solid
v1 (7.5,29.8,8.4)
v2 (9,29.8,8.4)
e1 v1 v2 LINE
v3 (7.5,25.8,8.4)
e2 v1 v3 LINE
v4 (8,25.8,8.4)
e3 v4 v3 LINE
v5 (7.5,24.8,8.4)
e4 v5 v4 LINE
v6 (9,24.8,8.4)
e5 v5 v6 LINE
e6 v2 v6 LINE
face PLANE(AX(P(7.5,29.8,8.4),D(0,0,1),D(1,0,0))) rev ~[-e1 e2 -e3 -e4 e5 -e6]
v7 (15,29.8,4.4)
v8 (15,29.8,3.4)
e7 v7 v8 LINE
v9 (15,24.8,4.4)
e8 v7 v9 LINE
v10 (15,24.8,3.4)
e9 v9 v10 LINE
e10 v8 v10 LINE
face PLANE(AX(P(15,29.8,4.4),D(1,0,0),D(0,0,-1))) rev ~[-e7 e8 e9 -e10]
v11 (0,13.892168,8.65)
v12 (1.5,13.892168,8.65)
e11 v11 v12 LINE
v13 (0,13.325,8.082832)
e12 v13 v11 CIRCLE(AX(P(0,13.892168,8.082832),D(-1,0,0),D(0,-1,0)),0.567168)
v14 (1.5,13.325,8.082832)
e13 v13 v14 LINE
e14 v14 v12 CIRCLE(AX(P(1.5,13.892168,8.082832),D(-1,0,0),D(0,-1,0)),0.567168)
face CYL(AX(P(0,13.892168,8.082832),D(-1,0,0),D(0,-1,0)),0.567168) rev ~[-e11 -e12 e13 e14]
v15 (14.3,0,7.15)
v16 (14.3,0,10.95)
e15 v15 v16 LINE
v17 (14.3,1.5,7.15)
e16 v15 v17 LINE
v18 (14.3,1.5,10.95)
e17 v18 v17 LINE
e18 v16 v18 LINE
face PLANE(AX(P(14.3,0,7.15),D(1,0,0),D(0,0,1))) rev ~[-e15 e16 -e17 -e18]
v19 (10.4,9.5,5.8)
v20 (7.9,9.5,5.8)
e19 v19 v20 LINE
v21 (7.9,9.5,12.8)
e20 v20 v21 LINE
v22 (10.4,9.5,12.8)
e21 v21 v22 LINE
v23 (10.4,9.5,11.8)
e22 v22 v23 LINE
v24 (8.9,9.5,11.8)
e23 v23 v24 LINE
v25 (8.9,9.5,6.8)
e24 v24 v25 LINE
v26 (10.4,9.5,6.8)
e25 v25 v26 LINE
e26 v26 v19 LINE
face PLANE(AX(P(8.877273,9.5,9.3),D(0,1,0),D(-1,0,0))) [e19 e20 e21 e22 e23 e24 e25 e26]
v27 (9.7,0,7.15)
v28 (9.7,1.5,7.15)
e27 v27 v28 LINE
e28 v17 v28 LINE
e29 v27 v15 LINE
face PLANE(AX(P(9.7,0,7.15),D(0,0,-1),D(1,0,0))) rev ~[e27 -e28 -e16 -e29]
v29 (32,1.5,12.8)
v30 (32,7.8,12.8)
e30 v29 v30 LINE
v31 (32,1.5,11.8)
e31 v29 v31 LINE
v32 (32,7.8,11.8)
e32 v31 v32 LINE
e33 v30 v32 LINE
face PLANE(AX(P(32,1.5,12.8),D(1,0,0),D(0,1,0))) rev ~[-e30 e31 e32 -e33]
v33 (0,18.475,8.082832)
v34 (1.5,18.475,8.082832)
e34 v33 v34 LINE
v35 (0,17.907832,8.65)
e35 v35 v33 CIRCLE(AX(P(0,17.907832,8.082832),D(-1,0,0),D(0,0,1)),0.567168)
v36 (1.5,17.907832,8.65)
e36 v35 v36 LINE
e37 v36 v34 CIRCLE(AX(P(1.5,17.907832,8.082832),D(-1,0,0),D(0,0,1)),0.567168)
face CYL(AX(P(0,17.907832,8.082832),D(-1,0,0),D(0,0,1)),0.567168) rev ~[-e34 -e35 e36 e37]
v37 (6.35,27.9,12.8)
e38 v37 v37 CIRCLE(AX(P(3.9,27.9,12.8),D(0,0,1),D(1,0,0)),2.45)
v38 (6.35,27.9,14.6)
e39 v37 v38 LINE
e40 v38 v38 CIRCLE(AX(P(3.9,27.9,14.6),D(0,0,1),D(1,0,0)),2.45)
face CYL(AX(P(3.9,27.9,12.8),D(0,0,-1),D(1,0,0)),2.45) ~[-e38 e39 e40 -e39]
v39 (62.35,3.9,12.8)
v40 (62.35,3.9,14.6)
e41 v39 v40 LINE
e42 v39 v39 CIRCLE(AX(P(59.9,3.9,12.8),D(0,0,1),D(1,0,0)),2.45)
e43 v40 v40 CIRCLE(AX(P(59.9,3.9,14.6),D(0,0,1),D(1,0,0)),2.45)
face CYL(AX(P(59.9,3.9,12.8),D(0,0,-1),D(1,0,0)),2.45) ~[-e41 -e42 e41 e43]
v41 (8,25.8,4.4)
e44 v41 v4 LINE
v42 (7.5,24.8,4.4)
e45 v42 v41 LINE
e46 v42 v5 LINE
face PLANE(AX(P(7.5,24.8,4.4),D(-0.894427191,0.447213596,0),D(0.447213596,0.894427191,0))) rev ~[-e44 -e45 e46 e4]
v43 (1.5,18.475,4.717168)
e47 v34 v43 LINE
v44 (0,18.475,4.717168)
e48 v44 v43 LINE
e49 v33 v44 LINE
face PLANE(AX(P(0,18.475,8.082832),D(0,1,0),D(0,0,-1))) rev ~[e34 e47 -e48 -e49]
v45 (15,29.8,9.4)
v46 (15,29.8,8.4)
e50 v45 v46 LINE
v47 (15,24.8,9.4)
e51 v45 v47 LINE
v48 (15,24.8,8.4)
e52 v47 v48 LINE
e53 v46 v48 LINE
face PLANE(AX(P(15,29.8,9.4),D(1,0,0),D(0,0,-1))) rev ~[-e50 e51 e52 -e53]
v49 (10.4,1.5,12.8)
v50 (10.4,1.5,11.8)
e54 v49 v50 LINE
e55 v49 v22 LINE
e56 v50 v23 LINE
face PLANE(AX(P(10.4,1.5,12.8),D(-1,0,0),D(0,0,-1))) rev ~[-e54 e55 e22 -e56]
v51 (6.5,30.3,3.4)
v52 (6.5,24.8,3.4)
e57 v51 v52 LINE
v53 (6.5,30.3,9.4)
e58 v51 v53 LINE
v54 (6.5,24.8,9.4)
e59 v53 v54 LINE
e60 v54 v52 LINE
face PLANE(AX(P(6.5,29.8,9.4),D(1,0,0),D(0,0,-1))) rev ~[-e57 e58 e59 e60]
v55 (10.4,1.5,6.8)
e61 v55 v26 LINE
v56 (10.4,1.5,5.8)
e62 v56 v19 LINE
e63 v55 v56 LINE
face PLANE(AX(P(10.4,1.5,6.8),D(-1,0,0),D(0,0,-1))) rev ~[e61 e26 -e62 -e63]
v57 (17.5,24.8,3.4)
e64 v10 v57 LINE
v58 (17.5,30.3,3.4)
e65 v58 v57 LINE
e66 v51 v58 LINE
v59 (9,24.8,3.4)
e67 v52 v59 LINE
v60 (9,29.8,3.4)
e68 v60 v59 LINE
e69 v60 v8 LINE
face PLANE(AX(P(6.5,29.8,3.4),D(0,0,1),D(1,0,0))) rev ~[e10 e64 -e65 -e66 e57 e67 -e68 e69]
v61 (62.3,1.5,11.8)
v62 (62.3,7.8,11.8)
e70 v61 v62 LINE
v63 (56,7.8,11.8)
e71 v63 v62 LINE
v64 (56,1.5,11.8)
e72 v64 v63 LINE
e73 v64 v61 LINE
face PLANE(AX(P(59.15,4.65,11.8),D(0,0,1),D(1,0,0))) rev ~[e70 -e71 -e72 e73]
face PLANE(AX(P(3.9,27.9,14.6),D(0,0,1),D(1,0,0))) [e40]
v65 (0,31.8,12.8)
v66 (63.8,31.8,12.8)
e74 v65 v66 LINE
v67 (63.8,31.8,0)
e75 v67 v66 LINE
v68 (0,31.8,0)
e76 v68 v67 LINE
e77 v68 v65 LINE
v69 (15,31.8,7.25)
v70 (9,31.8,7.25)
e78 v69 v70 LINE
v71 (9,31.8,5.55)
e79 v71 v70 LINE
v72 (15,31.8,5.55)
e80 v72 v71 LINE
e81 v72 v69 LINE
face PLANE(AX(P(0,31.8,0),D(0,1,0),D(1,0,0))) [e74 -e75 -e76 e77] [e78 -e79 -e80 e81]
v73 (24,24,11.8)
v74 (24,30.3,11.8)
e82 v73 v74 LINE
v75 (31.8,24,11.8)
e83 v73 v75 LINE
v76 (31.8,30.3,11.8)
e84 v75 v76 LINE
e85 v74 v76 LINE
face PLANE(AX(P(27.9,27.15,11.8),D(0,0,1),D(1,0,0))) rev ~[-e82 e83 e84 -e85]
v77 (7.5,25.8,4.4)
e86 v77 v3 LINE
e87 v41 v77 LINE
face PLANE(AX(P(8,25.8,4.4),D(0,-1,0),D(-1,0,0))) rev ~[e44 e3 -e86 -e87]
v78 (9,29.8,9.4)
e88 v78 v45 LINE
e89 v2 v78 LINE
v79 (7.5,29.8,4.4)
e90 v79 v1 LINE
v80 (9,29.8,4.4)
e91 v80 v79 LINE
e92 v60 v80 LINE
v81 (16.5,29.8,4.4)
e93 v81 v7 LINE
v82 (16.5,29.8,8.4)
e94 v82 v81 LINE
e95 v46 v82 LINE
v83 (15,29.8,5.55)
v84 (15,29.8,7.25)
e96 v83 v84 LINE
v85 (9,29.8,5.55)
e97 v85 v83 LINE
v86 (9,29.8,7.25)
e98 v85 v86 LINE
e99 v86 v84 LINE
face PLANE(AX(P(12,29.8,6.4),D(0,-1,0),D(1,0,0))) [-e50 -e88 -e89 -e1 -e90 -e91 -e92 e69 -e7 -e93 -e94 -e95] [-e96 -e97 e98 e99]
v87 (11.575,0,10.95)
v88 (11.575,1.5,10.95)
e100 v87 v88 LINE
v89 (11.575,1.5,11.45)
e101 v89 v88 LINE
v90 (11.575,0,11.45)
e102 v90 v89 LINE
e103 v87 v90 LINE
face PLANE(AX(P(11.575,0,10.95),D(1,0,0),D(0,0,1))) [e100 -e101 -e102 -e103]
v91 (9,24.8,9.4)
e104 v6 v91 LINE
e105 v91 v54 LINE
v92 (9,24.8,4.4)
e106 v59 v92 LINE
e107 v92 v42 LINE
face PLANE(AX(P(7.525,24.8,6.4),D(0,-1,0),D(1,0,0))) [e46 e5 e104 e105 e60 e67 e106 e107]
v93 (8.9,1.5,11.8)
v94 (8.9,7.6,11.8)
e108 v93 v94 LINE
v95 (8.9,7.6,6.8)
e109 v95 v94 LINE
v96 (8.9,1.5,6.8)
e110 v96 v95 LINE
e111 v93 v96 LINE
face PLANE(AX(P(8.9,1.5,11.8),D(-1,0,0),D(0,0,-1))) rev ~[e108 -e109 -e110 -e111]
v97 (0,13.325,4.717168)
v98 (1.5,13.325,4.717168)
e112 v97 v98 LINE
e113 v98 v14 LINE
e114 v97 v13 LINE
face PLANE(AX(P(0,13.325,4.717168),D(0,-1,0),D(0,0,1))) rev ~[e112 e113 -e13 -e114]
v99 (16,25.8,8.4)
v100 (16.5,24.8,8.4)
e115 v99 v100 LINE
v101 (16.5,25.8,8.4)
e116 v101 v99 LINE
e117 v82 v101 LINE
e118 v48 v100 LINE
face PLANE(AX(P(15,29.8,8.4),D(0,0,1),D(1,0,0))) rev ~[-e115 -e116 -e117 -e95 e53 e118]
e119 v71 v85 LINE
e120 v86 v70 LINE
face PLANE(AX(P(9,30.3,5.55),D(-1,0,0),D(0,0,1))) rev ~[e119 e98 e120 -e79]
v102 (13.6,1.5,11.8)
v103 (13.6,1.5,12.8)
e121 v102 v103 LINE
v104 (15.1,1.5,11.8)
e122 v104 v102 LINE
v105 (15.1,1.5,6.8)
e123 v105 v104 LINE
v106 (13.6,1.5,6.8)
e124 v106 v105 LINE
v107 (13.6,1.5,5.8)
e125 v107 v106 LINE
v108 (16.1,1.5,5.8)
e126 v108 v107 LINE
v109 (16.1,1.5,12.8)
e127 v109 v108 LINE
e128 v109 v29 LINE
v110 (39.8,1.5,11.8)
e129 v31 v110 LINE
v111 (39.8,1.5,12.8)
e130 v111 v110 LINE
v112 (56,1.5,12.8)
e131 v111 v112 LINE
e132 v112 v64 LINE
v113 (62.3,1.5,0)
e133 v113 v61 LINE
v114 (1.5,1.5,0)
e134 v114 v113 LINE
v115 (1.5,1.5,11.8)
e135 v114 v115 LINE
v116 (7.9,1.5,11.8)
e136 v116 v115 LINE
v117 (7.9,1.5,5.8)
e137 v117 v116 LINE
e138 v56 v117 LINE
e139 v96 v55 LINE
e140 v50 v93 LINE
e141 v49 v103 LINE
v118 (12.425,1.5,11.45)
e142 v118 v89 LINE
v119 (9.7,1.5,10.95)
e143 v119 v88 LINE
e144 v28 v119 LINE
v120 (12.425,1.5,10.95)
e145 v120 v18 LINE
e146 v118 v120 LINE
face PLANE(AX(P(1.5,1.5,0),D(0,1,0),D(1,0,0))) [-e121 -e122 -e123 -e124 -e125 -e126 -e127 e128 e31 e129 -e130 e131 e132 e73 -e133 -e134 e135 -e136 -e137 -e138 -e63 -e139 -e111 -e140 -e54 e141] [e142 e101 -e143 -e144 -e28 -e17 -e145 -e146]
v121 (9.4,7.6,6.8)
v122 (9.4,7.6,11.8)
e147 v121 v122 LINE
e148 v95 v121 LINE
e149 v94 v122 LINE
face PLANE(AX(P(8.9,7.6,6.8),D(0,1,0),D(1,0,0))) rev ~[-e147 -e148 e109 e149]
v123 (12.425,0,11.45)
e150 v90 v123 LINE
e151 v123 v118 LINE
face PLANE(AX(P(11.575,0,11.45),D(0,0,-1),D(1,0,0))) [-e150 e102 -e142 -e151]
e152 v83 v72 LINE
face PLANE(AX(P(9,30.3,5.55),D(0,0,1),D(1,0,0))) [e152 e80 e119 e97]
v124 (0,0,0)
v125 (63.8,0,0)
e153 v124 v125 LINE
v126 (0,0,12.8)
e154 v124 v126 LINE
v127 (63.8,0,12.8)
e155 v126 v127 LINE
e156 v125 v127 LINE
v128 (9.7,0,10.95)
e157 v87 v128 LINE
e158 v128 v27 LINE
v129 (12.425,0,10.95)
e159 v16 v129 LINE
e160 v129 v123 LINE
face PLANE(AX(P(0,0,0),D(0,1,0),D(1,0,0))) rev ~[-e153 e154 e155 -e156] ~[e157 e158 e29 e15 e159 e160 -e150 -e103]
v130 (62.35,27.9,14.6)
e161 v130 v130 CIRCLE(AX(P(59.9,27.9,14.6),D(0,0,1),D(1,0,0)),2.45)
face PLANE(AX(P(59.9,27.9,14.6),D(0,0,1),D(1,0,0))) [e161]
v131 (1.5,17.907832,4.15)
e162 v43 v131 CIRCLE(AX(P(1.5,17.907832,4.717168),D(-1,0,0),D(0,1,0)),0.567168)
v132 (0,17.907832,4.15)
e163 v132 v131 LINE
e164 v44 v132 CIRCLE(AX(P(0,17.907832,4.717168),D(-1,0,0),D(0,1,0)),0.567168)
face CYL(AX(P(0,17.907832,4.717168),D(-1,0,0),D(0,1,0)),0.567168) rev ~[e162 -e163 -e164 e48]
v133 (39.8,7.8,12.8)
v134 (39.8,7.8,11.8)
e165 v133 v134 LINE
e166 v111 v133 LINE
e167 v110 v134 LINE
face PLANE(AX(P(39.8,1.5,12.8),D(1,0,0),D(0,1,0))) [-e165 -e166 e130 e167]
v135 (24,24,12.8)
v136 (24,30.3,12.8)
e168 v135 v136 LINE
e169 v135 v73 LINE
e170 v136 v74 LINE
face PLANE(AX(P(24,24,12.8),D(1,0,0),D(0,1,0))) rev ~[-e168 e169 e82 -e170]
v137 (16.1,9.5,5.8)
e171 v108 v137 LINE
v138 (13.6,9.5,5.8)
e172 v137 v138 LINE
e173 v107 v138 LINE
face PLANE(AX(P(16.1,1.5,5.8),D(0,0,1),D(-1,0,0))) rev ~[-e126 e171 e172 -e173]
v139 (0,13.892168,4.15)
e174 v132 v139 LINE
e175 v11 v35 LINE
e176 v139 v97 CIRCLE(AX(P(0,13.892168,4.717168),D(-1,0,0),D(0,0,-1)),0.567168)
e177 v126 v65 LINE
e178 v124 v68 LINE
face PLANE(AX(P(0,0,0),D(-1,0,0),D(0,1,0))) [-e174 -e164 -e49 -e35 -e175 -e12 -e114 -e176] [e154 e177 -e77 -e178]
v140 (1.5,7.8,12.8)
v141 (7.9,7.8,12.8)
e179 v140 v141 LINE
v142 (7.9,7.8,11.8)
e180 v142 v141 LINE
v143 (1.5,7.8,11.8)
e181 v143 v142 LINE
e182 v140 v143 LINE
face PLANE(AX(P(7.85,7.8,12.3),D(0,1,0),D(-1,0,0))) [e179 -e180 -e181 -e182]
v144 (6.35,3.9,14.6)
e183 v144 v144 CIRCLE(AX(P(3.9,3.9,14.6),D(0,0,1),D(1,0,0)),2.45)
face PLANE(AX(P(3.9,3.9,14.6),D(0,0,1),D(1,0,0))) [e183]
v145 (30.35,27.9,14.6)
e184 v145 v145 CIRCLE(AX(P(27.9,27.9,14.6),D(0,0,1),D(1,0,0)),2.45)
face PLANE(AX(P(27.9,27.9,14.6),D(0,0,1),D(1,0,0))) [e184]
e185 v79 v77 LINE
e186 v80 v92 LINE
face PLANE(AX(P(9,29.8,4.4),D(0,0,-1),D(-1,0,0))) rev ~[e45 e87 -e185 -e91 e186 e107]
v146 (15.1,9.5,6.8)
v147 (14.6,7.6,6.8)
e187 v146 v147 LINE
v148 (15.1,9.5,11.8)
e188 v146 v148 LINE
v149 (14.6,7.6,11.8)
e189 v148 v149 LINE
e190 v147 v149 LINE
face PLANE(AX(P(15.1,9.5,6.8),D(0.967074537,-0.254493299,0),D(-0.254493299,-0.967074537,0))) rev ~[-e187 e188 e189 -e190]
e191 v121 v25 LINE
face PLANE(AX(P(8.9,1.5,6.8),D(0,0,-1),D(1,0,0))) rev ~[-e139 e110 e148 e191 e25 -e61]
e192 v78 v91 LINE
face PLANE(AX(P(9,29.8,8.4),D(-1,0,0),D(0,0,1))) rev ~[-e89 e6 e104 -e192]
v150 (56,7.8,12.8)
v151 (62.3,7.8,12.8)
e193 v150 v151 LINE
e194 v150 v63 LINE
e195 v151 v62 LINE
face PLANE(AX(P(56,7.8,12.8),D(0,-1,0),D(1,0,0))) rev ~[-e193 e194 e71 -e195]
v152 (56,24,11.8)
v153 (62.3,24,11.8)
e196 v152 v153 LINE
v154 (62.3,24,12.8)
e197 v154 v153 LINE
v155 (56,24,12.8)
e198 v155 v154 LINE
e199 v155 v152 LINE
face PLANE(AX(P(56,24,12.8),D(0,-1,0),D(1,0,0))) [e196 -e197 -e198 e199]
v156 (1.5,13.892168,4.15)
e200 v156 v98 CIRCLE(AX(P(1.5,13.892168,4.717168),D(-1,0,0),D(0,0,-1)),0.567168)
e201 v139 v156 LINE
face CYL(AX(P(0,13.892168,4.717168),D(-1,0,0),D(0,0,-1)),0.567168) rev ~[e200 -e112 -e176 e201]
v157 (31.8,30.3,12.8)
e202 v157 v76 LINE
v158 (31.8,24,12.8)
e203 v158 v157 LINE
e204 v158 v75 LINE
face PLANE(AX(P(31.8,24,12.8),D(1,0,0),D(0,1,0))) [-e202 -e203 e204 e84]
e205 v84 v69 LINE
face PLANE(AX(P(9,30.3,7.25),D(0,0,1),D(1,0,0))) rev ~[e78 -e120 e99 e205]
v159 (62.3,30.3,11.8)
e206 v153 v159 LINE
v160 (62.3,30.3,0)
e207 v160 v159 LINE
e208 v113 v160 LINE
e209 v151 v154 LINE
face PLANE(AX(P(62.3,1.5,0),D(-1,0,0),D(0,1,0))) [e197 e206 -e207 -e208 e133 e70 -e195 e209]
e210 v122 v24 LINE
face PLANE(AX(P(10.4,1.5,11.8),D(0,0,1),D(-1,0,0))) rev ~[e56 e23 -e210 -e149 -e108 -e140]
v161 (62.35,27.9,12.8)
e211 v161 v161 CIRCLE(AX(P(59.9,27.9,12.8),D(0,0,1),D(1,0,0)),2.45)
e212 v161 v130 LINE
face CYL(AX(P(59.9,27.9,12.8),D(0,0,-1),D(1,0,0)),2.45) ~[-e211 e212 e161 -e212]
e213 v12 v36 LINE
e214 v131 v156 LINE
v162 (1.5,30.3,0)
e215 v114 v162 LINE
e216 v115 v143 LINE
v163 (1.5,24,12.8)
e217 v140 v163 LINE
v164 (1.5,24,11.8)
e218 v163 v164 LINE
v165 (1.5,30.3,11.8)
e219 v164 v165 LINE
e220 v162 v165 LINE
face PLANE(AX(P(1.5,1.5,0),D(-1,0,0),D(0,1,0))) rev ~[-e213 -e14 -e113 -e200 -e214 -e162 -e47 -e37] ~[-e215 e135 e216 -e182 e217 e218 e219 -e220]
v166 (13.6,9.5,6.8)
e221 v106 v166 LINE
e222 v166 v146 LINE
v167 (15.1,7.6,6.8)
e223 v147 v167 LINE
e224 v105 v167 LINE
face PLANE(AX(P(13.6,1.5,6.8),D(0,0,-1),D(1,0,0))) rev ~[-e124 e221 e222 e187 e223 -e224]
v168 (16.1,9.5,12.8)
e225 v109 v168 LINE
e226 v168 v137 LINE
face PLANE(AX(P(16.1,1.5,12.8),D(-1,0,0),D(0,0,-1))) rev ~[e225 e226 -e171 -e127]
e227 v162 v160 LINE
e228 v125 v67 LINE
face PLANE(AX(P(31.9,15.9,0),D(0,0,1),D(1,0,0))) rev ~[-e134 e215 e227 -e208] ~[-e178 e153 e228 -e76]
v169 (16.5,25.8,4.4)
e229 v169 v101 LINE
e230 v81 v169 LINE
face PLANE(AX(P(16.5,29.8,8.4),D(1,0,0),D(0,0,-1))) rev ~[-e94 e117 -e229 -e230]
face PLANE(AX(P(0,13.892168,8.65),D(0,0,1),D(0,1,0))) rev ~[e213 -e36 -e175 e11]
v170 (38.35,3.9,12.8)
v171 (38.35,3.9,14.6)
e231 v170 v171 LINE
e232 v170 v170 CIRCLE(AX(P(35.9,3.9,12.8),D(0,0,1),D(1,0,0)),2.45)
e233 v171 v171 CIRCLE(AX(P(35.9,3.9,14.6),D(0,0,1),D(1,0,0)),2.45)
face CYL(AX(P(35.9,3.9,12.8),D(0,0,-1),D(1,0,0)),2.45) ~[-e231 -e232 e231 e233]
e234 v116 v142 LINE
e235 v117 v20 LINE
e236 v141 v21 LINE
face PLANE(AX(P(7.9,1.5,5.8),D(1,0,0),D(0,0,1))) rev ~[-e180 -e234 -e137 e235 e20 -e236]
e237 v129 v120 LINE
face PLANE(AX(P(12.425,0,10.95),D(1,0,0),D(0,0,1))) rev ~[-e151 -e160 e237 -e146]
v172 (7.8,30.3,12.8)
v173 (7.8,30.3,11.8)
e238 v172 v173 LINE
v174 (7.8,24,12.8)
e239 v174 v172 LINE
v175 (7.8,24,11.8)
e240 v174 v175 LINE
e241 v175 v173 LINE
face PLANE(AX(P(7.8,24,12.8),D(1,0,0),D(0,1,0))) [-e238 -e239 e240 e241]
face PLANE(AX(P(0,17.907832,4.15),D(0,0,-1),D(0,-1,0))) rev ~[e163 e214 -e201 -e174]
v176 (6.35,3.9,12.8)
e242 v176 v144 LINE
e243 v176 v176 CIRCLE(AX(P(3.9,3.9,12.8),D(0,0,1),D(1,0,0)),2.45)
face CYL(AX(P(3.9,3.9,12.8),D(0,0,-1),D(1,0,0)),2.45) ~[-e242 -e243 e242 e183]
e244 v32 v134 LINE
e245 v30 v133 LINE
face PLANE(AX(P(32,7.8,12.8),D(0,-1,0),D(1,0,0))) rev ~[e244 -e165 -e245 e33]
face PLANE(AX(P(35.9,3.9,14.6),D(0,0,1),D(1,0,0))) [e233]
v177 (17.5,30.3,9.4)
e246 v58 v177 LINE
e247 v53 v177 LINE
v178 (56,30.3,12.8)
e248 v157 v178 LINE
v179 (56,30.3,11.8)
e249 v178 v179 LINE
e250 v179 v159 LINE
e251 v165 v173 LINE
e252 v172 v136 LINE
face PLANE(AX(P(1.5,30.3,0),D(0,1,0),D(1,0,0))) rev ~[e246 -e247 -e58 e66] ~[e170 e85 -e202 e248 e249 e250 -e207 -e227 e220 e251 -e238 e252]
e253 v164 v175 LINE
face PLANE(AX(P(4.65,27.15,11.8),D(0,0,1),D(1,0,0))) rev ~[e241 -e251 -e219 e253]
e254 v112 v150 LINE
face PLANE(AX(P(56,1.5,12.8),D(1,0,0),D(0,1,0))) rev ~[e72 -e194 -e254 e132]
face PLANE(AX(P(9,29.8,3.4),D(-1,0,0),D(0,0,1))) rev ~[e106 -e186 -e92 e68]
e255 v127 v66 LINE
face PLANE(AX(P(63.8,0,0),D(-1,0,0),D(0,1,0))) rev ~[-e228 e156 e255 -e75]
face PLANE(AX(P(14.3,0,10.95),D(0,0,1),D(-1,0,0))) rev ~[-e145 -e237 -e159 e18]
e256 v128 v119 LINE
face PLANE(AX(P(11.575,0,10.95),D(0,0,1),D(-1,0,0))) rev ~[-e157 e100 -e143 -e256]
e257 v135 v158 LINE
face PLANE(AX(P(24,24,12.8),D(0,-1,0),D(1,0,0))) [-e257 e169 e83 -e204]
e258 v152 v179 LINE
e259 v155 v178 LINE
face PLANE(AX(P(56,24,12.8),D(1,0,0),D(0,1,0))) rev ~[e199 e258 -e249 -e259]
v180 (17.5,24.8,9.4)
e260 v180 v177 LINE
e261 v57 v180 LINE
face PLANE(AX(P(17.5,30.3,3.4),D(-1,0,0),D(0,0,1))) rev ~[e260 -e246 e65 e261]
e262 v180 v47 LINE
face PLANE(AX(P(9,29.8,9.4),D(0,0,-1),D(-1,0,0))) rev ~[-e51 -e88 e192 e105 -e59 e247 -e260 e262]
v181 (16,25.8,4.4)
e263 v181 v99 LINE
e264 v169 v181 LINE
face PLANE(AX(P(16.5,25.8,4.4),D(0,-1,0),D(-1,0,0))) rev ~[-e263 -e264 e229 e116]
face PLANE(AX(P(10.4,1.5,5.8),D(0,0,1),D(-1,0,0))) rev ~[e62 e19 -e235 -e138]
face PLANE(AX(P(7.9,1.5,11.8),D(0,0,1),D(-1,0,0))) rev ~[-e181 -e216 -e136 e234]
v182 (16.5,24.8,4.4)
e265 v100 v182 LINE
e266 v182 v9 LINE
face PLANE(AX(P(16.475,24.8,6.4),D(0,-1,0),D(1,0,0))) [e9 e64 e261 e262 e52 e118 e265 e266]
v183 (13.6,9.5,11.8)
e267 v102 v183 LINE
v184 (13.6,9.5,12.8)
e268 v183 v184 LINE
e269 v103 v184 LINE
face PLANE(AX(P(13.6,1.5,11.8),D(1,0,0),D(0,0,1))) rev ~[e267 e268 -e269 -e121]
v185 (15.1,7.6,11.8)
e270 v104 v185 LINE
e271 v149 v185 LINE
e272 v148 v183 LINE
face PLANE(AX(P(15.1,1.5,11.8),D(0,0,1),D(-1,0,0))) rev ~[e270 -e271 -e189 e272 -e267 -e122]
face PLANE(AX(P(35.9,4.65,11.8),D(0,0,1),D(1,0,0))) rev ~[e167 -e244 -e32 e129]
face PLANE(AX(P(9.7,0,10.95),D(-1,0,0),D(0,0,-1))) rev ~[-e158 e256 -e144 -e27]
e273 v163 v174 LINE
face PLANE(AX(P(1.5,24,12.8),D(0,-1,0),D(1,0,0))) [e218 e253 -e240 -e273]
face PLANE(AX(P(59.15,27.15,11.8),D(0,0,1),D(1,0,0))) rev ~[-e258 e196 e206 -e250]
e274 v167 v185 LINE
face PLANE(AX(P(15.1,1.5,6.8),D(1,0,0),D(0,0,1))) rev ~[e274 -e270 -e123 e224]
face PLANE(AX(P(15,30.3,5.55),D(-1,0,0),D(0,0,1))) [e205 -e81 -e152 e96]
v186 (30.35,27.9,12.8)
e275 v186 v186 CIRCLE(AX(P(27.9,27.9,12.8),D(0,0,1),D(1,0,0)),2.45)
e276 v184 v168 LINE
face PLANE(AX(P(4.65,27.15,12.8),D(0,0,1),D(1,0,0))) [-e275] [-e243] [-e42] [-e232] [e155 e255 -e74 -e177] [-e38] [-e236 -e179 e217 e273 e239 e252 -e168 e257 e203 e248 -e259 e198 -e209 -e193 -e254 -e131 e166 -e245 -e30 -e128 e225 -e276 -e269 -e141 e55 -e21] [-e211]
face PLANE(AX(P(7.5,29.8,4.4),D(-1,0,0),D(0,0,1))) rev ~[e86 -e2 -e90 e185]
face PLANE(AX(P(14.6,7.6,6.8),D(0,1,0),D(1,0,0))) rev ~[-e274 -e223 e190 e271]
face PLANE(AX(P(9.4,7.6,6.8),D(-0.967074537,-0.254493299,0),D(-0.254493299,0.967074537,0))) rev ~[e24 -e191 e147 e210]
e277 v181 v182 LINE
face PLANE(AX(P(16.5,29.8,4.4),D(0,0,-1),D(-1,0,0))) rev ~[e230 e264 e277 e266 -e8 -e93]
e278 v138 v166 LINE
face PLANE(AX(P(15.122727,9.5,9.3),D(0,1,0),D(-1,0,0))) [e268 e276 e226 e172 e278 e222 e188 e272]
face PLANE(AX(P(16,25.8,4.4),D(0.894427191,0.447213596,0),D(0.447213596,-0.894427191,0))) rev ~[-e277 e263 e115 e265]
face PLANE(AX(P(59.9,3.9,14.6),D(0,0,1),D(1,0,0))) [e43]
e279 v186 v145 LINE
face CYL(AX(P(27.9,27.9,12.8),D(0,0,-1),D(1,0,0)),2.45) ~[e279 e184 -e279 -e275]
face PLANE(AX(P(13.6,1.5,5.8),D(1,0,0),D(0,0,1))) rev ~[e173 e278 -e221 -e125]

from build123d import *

# Parameters (mm, degrees)
F0_W      = 63.8
F0_H      = 31.8
F0_W_2    = 60.8
F0_H_2    = 28.8
F1_DEPTH  = 12.8
F2_W      = 6.3
F2_H      = 6.3
F2_W_2    = 7.8
F3_DEPTH  = 1
F4_R      = 2.45
F5_DEPTH  = 1.8
F6_W      = 0.85
F6_H      = 0.5
F7_DEPTH  = 25.4
F9_DEPTH  = 8
F11_DEPTH = 5
F12_W     = 0.1
F12_H     = 1
F13_DEPTH = 6.3
F14_W     = 6
F14_H     = 1.7
F15_DEPTH = 2.54
F16_W     = 11
F16_H     = 6
F16_W_2   = 6
F16_H_2   = 1.7
F17_DEPTH = 0.5
F19_DEPTH = 5
F21_DEPTH = 4
F23_DEPTH = 25.4


# Not quite as in the source:
# - a feature names something its author has since deleted; it is built from what else it names


with BuildPart() as f1:
    # F0 (on Top) → F1 (new body)
    with BuildSketch(Plane.XY):
        with Locations((31.9, 15.9)):
            Rectangle(F0_W, F0_H)
        with Locations((31.9, 15.9)):
            Rectangle(F0_W_2, F0_H_2, mode=Mode.SUBTRACT)
    extrude(amount=F1_DEPTH)

    # F2 (on face) → F3 (join)
    with BuildSketch(Plane.XY.offset(12.8)):
        with Locations((4.65, 27.15)):
            Rectangle(F2_W, F2_H)
        with Locations((4.65, 4.65)):
            Rectangle(F2_W, F2_H)
        with Locations((59.15, 4.65)):
            Rectangle(F2_W, F2_H)
        with Locations((59.15, 27.15)):
            Rectangle(F2_W, F2_H)
        with Locations((27.9, 27.15)):
            Rectangle(F2_W_2, F2_H)
        with Locations((35.9, 4.65)):
            Rectangle(F2_W_2, F2_H)
    extrude(amount=-F3_DEPTH)

    # F4 (on face) → F5 (join)
    with BuildSketch(Plane.XY.offset(12.8)):
        with Locations((3.9, 27.9)):
            Circle(F4_R)
        with Locations((59.9, 27.9)):
            Circle(F4_R)
        with Locations((59.9, 3.9)):
            Circle(F4_R)
        with Locations((3.9, 3.9)):
            Circle(F4_R)
        with Locations((27.9, 27.9)):
            Circle(F4_R)
        with Locations((35.9, 3.9)):
            Circle(F4_R)
    extrude(amount=F5_DEPTH)

    # F6 (on face) → F7 (cut)
    with BuildSketch(Plane.XZ):
        Polygon((11.575, 10.95), (9.7, 10.95), (9.7, 7.15), (14.3, 7.15), (14.3, 10.95), (12.425, 10.95), align=None)
        with Locations((12, 11.2)):
            Rectangle(F6_W, F6_H)
    extrude(amount=-F7_DEPTH, mode=Mode.SUBTRACT)

    # F8 (on face) → F9 (join)
    with BuildSketch(Plane(origin=(0, 1.5, 0), x_dir=(-1, 0, 0), z_dir=(0, 1, 0))):
        Polygon((-13.6, 5.8), (-13.6, 6.8), (-15.1, 6.8), (-15.1, 11.8), (-13.6, 11.8), (-13.6, 12.8), (-16.1, 12.8), (-16.1, 5.8), align=None)
        Polygon((-8.9, 6.8), (-10.4, 6.8), (-10.4, 5.8), (-7.9, 5.8), (-7.9, 12.8), (-10.4, 12.8), (-10.4, 11.8), (-8.9, 11.8), align=None)
    extrude(amount=F9_DEPTH)

    # F10 (on face) → F11 (join, through all)
    with BuildSketch(Plane.XY.offset(6.8)):
        Polygon((14.6, 7.6), (15.1, 7.6), (15.1, 9.5), align=None)
        Polygon((9.4, 7.6), (8.9, 9.5), (8.9, 7.6), align=None)
    extrude(amount=F11_DEPTH)

    # F12 (on face) → F13 (join, through all)
    with BuildSketch(Plane(origin=(0, 1.5, 0), x_dir=(-1, 0, 0), z_dir=(0, 1, 0))):
        with Locations((-7.85, 12.3)):
            Rectangle(F12_W, F12_H)
    extrude(amount=F13_DEPTH)

    # F14 (on face) → F15 (cut)
    with BuildSketch(Plane(origin=(0, 31.8, 0), x_dir=(-1, 0, 0), z_dir=(0, 1, 0))):
        with Locations((-12, 6.4)):
            Rectangle(F14_W, F14_H)
    extrude(amount=-F15_DEPTH, mode=Mode.SUBTRACT)

    # F16 (on face) → F17 (join)
    with BuildSketch(Plane.XZ.offset(-30.3)):
        with Locations((12, 6.4)):
            Rectangle(F16_W, F16_H)
        with Locations((12, 6.4)):
            Rectangle(F16_W_2, F16_H_2, mode=Mode.SUBTRACT)
    extrude(amount=F17_DEPTH)

    # F18 (on face) → F19 (join)
    with BuildSketch(Plane.XZ.offset(-29.8)):
        Polygon((9, 9.4), (6.5, 9.4), (6.5, 3.4), (9, 3.4), (9, 4.4), (7.5, 4.4), (7.5, 8.4), (9, 8.4), align=None)
        Polygon((17.5, 9.4), (15, 9.4), (15, 8.4), (16.5, 8.4), (16.5, 4.4), (15, 4.4), (15, 3.4), (17.5, 3.4), align=None)
    extrude(amount=F19_DEPTH)

    # F20 (on face) → F21 (join, through all)
    with BuildSketch(Plane.XY.offset(4.4)):
        Polygon((7.5, 25.8), (7.5, 24.8), (8, 25.8), align=None)
        Polygon((16, 25.8), (16.5, 24.8), (16.5, 25.8), align=None)
    extrude(amount=F21_DEPTH)

    # F22 (on face) → F23 (cut)
    with BuildSketch(Plane(origin=(0, 0, 0), x_dir=(0, -1, 0), z_dir=(-1, 0, 0))):
        with BuildLine():
            Line((-13.8921684574, 8.65), (-17.9078315426, 8.65))
            ThreePointArc((-17.9078315426, 8.65), (-18.3088802049, 8.4838802049), (-18.475, 8.0828315426))
            Line((-18.475, 8.0828315426), (-18.475, 4.7171684574))
            ThreePointArc((-18.475, 4.7171684574), (-18.3088802049, 4.3161197951), (-17.9078315426, 4.15))
            Line((-17.9078315426, 4.15), (-13.8921684574, 4.15))
            ThreePointArc((-13.8921684574, 4.15), (-13.4911197951, 4.3161197951), (-13.325, 4.7171684574))
            Line((-13.325, 4.7171684574), (-13.325, 8.0828315426))
            ThreePointArc((-13.325, 8.0828315426), (-13.4911197951, 8.4838802049), (-13.8921684574, 8.65))
        make_face()
    extrude(amount=-F23_DEPTH, mode=Mode.SUBTRACT)


solid = f1.part
